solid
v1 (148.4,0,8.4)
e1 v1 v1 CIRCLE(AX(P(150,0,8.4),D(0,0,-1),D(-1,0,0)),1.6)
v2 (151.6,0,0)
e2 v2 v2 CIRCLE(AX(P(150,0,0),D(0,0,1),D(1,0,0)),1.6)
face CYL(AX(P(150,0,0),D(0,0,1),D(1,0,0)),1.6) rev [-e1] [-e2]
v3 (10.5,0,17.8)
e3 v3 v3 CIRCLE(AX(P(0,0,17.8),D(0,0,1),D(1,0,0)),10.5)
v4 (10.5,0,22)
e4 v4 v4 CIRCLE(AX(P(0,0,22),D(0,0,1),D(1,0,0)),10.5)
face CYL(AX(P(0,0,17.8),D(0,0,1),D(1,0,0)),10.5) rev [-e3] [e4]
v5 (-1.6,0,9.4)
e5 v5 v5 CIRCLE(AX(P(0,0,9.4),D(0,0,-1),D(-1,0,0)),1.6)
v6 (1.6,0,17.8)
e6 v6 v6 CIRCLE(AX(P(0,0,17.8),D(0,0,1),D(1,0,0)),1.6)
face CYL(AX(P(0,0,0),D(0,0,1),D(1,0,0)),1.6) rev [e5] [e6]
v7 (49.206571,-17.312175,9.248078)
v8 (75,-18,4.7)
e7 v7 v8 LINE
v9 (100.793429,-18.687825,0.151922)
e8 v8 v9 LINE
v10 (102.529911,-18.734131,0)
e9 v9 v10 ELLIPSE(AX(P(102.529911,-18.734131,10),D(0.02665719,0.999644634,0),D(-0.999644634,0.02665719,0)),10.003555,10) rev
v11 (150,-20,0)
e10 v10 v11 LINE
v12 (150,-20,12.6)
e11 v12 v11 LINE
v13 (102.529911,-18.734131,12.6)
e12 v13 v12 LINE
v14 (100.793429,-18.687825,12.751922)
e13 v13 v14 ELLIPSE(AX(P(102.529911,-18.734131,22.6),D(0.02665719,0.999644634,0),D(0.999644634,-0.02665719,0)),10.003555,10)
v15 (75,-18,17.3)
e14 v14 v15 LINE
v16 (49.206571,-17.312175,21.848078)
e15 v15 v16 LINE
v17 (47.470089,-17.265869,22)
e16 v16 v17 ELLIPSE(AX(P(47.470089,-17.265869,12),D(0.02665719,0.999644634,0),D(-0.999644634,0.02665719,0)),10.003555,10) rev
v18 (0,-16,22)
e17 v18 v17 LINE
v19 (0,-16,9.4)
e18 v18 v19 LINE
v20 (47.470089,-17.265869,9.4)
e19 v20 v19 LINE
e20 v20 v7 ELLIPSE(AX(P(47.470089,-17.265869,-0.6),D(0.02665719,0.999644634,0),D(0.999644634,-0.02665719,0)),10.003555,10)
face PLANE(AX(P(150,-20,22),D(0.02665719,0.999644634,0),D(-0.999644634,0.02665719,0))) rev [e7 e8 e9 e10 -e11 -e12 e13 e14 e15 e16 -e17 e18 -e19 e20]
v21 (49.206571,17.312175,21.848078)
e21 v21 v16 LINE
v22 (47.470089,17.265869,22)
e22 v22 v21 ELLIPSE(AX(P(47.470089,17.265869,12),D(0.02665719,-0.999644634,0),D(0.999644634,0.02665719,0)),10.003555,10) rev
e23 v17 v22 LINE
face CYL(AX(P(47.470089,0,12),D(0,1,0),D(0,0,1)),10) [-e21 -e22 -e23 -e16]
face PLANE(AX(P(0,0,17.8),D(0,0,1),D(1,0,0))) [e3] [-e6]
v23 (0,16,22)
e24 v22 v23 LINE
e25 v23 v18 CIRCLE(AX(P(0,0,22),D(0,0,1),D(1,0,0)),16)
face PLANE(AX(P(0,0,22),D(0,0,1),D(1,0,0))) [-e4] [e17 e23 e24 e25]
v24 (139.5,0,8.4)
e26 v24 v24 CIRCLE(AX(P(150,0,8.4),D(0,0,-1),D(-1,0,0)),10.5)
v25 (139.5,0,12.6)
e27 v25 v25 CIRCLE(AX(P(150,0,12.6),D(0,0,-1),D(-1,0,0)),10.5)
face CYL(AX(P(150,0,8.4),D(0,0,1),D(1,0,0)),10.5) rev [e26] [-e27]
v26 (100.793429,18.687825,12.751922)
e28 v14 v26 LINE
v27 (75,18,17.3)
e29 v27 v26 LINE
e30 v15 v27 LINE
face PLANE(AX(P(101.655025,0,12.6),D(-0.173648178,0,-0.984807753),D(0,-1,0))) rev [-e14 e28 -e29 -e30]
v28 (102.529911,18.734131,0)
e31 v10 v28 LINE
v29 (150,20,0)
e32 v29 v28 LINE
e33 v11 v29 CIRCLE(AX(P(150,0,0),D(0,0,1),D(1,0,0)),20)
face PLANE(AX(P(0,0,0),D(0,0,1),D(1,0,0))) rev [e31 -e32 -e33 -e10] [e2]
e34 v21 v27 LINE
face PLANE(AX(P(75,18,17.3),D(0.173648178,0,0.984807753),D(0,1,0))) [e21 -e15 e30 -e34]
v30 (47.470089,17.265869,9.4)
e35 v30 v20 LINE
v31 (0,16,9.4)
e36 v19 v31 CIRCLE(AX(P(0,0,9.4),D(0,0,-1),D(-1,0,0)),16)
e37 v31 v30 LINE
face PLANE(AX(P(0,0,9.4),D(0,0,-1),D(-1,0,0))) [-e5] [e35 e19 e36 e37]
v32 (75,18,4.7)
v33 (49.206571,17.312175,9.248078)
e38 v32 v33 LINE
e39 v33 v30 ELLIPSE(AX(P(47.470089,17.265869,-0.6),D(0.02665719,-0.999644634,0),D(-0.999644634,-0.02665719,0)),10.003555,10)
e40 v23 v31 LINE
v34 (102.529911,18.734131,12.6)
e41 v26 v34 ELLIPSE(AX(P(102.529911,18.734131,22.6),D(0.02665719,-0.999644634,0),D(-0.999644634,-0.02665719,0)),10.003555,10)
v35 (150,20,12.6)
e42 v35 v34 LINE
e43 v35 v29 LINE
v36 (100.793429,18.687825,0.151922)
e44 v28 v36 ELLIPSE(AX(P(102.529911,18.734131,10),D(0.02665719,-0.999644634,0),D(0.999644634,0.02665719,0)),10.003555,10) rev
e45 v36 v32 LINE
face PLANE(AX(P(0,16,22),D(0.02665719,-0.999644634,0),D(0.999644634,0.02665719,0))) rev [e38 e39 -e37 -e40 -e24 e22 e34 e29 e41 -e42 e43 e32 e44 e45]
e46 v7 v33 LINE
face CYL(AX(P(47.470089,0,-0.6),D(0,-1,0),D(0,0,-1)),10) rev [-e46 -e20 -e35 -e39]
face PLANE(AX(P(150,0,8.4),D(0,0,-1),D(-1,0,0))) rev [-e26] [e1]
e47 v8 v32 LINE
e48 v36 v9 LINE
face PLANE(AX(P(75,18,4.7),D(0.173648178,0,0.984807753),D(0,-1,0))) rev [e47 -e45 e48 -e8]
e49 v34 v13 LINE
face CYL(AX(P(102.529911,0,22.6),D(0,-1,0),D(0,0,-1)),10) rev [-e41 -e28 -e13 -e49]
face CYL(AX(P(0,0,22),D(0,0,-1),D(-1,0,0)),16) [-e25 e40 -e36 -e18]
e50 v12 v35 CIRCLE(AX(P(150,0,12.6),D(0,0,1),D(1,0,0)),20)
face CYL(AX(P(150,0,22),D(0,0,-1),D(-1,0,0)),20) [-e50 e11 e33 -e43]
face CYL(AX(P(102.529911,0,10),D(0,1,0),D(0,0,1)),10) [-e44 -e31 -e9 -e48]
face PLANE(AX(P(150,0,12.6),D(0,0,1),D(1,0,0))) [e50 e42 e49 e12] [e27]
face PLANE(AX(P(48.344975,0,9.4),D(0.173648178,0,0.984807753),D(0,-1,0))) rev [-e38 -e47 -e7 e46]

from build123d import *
from OCP.BRepFilletAPI import BRepFilletAPI_MakeChamfer

# Parameters (mm, degrees)
EXTRUDE_1_DEPTH     = 22
SKETCH_2_R          = 10.5
CUT_EXTRUDE_1_DEPTH = 4.2
CUT_EXTRUDE_START   = -9.4
CUT_EXTRUDE_6_DEPTH = 9.4
CUT_EXTRUDE_7_DEPTH = 9.4
SKETCH_4_R          = 10.5
CUT_EXTRUDE_2_DEPTH = 4.2
SKETCH_8_R          = 1.6
CUT_EXTRUDE_5_DEPTH = 173.095438638
CHAMFER_1_SIZE      = 4.7
CHAMFER_1_SIZE2     = 26.655024552
CHAMFER_2_SIZE2     = 26.655024552
CHAMFER_2_SIZE      = 4.7
CHAMFER_3_SIZE2     = 4.7
CHAMFER_3_SIZE      = 26.655024552
FILLET_4_R          = 10


with BuildPart() as part:
    # 草图1 → 凸台-拉伸1 (new body)
    with BuildSketch(Plane.XY):
        with BuildLine():
            Line((0, 16), (150, 20))
            ThreePointArc((150, 20), (170, 0), (150, -20))
            Line((150, -20), (0, -16))
            ThreePointArc((0, -16), (-16, 0), (0, 16))
        make_face()
    extrude(amount=EXTRUDE_1_DEPTH)

    # 草图2 → 切除-拉伸1 (cut)
    with BuildSketch(Plane.XY.offset(22)):
        Circle(SKETCH_2_R)
    extrude(amount=-CUT_EXTRUDE_1_DEPTH, mode=Mode.SUBTRACT)

    # 草图9 → 切除-拉伸6 (cut)
    with BuildSketch(Plane.XY.offset(22).offset(CUT_EXTRUDE_START)):
        with BuildLine():
            Line((75, 18), (75, -18))
            Line((75, -18), (150, -20))
            ThreePointArc((150, -20), (170, 0), (150, 20))
            Line((150, 20), (75, 18))
        make_face()
    extrude(amount=CUT_EXTRUDE_6_DEPTH, mode=Mode.SUBTRACT)

    # 草图10 → 切除-拉伸7 (cut)
    with BuildSketch(Plane(origin=(0, 0, 0), x_dir=(-1, 0, 0), z_dir=(0, 0, -1))):
        with BuildLine():
            Line((-75, 18), (-75, -18))
            Line((-75, -18), (0, -16))
            ThreePointArc((0, -16), (16, 0), (0, 16))
            Line((0, 16), (-75, 18))
        make_face()
    extrude(amount=-CUT_EXTRUDE_7_DEPTH, mode=Mode.SUBTRACT)

    # 草图4 → 切除-拉伸2 (cut)
    with BuildSketch(Plane(origin=(0, 0, 12.6), x_dir=(-1, 0, 0), z_dir=(0, 0, -1))):
        with Locations((-150, 0)):
            Circle(SKETCH_4_R)
    extrude(amount=CUT_EXTRUDE_2_DEPTH, mode=Mode.SUBTRACT)

    # 草图8 → 切除-拉伸5 (cut, through all)
    with BuildSketch(Plane.XY.offset(17.8)):
        Circle(SKETCH_8_R)
        with Locations((150, 0)):
            Circle(SKETCH_8_R)
    extrude(amount=-CUT_EXTRUDE_5_DEPTH, mode=Mode.SUBTRACT)

    # 倒角1: one chamfer whose edges measure the first distance from different faces: ONE call of the kernel's chamfer builder (chamfer() names one face for all edges)
    chamfer_1_edges_1 = [part.edges().sort_by_distance(p)[0] for p in [
        (75, 0, 12.6),
    ]]
    chamfer_1_side_1 = [part.faces().sort_by_distance(p)[0] for p in [
        (75, 0, 17.3),
    ]]
    chamfer_1_edges_2 = [part.edges().sort_by_distance(p)[0] for p in [
        (75, 0, 9.4),
    ]]
    chamfer_1_side_2 = [part.faces().sort_by_distance(p)[0] for p in [
        (75, 0, 4.7),
    ]]
    chamfer_1 = BRepFilletAPI_MakeChamfer(part.part.solid().wrapped)
    for e in chamfer_1_edges_1:
        chamfer_1.Add(CHAMFER_1_SIZE, CHAMFER_1_SIZE2, e.wrapped, chamfer_1_side_1[0].wrapped)  # the first distance lies on this face
    for e in chamfer_1_edges_2:
        chamfer_1.Add(CHAMFER_1_SIZE, CHAMFER_1_SIZE2, e.wrapped, chamfer_1_side_2[0].wrapped)  # the first distance lies on this face
    add(Compound.cast(chamfer_1.Shape()), mode=Mode.REPLACE)

    # 倒角2
    chamfer_2_edges = [part.edges().sort_by_distance(p)[0] for p in [
        (75, 0, 22),
    ]]
    chamfer_2_side = [part.faces().sort_by_distance(p)[0] for p in [
        (75, 0, 21.906),
    ]]
    chamfer(chamfer_2_edges, length=CHAMFER_2_SIZE - 0.0001, length2=CHAMFER_2_SIZE2 - 0.0001, reference=chamfer_2_side[0])  # a hair under: the kernel refuses the full size

    # 倒角3
    chamfer_3_edges = [part.edges().sort_by_distance(p)[0] for p in [
        (75, 0, 0),
    ]]
    chamfer_3_side = [part.faces().sort_by_distance(p)[0] for p in [
        (75.094, 0, 0),
    ]]
    chamfer(chamfer_3_edges, length=CHAMFER_3_SIZE - 0.0001, length2=CHAMFER_3_SIZE2 - 0.0001, reference=chamfer_3_side[0])  # a hair under: the kernel refuses the full size

    # 圆角4
    fillet_4_edges = [part.edges().sort_by_distance(p)[0] for p in [
        (101.655024552, 0, 12.6),
        (48.344975448, 0, 9.4),
        (48.345075448, 0, 22),
        (101.654924552, 0, 0),
    ]]
    fillet(fillet_4_edges, radius=FILLET_4_R)


solid = part.part
